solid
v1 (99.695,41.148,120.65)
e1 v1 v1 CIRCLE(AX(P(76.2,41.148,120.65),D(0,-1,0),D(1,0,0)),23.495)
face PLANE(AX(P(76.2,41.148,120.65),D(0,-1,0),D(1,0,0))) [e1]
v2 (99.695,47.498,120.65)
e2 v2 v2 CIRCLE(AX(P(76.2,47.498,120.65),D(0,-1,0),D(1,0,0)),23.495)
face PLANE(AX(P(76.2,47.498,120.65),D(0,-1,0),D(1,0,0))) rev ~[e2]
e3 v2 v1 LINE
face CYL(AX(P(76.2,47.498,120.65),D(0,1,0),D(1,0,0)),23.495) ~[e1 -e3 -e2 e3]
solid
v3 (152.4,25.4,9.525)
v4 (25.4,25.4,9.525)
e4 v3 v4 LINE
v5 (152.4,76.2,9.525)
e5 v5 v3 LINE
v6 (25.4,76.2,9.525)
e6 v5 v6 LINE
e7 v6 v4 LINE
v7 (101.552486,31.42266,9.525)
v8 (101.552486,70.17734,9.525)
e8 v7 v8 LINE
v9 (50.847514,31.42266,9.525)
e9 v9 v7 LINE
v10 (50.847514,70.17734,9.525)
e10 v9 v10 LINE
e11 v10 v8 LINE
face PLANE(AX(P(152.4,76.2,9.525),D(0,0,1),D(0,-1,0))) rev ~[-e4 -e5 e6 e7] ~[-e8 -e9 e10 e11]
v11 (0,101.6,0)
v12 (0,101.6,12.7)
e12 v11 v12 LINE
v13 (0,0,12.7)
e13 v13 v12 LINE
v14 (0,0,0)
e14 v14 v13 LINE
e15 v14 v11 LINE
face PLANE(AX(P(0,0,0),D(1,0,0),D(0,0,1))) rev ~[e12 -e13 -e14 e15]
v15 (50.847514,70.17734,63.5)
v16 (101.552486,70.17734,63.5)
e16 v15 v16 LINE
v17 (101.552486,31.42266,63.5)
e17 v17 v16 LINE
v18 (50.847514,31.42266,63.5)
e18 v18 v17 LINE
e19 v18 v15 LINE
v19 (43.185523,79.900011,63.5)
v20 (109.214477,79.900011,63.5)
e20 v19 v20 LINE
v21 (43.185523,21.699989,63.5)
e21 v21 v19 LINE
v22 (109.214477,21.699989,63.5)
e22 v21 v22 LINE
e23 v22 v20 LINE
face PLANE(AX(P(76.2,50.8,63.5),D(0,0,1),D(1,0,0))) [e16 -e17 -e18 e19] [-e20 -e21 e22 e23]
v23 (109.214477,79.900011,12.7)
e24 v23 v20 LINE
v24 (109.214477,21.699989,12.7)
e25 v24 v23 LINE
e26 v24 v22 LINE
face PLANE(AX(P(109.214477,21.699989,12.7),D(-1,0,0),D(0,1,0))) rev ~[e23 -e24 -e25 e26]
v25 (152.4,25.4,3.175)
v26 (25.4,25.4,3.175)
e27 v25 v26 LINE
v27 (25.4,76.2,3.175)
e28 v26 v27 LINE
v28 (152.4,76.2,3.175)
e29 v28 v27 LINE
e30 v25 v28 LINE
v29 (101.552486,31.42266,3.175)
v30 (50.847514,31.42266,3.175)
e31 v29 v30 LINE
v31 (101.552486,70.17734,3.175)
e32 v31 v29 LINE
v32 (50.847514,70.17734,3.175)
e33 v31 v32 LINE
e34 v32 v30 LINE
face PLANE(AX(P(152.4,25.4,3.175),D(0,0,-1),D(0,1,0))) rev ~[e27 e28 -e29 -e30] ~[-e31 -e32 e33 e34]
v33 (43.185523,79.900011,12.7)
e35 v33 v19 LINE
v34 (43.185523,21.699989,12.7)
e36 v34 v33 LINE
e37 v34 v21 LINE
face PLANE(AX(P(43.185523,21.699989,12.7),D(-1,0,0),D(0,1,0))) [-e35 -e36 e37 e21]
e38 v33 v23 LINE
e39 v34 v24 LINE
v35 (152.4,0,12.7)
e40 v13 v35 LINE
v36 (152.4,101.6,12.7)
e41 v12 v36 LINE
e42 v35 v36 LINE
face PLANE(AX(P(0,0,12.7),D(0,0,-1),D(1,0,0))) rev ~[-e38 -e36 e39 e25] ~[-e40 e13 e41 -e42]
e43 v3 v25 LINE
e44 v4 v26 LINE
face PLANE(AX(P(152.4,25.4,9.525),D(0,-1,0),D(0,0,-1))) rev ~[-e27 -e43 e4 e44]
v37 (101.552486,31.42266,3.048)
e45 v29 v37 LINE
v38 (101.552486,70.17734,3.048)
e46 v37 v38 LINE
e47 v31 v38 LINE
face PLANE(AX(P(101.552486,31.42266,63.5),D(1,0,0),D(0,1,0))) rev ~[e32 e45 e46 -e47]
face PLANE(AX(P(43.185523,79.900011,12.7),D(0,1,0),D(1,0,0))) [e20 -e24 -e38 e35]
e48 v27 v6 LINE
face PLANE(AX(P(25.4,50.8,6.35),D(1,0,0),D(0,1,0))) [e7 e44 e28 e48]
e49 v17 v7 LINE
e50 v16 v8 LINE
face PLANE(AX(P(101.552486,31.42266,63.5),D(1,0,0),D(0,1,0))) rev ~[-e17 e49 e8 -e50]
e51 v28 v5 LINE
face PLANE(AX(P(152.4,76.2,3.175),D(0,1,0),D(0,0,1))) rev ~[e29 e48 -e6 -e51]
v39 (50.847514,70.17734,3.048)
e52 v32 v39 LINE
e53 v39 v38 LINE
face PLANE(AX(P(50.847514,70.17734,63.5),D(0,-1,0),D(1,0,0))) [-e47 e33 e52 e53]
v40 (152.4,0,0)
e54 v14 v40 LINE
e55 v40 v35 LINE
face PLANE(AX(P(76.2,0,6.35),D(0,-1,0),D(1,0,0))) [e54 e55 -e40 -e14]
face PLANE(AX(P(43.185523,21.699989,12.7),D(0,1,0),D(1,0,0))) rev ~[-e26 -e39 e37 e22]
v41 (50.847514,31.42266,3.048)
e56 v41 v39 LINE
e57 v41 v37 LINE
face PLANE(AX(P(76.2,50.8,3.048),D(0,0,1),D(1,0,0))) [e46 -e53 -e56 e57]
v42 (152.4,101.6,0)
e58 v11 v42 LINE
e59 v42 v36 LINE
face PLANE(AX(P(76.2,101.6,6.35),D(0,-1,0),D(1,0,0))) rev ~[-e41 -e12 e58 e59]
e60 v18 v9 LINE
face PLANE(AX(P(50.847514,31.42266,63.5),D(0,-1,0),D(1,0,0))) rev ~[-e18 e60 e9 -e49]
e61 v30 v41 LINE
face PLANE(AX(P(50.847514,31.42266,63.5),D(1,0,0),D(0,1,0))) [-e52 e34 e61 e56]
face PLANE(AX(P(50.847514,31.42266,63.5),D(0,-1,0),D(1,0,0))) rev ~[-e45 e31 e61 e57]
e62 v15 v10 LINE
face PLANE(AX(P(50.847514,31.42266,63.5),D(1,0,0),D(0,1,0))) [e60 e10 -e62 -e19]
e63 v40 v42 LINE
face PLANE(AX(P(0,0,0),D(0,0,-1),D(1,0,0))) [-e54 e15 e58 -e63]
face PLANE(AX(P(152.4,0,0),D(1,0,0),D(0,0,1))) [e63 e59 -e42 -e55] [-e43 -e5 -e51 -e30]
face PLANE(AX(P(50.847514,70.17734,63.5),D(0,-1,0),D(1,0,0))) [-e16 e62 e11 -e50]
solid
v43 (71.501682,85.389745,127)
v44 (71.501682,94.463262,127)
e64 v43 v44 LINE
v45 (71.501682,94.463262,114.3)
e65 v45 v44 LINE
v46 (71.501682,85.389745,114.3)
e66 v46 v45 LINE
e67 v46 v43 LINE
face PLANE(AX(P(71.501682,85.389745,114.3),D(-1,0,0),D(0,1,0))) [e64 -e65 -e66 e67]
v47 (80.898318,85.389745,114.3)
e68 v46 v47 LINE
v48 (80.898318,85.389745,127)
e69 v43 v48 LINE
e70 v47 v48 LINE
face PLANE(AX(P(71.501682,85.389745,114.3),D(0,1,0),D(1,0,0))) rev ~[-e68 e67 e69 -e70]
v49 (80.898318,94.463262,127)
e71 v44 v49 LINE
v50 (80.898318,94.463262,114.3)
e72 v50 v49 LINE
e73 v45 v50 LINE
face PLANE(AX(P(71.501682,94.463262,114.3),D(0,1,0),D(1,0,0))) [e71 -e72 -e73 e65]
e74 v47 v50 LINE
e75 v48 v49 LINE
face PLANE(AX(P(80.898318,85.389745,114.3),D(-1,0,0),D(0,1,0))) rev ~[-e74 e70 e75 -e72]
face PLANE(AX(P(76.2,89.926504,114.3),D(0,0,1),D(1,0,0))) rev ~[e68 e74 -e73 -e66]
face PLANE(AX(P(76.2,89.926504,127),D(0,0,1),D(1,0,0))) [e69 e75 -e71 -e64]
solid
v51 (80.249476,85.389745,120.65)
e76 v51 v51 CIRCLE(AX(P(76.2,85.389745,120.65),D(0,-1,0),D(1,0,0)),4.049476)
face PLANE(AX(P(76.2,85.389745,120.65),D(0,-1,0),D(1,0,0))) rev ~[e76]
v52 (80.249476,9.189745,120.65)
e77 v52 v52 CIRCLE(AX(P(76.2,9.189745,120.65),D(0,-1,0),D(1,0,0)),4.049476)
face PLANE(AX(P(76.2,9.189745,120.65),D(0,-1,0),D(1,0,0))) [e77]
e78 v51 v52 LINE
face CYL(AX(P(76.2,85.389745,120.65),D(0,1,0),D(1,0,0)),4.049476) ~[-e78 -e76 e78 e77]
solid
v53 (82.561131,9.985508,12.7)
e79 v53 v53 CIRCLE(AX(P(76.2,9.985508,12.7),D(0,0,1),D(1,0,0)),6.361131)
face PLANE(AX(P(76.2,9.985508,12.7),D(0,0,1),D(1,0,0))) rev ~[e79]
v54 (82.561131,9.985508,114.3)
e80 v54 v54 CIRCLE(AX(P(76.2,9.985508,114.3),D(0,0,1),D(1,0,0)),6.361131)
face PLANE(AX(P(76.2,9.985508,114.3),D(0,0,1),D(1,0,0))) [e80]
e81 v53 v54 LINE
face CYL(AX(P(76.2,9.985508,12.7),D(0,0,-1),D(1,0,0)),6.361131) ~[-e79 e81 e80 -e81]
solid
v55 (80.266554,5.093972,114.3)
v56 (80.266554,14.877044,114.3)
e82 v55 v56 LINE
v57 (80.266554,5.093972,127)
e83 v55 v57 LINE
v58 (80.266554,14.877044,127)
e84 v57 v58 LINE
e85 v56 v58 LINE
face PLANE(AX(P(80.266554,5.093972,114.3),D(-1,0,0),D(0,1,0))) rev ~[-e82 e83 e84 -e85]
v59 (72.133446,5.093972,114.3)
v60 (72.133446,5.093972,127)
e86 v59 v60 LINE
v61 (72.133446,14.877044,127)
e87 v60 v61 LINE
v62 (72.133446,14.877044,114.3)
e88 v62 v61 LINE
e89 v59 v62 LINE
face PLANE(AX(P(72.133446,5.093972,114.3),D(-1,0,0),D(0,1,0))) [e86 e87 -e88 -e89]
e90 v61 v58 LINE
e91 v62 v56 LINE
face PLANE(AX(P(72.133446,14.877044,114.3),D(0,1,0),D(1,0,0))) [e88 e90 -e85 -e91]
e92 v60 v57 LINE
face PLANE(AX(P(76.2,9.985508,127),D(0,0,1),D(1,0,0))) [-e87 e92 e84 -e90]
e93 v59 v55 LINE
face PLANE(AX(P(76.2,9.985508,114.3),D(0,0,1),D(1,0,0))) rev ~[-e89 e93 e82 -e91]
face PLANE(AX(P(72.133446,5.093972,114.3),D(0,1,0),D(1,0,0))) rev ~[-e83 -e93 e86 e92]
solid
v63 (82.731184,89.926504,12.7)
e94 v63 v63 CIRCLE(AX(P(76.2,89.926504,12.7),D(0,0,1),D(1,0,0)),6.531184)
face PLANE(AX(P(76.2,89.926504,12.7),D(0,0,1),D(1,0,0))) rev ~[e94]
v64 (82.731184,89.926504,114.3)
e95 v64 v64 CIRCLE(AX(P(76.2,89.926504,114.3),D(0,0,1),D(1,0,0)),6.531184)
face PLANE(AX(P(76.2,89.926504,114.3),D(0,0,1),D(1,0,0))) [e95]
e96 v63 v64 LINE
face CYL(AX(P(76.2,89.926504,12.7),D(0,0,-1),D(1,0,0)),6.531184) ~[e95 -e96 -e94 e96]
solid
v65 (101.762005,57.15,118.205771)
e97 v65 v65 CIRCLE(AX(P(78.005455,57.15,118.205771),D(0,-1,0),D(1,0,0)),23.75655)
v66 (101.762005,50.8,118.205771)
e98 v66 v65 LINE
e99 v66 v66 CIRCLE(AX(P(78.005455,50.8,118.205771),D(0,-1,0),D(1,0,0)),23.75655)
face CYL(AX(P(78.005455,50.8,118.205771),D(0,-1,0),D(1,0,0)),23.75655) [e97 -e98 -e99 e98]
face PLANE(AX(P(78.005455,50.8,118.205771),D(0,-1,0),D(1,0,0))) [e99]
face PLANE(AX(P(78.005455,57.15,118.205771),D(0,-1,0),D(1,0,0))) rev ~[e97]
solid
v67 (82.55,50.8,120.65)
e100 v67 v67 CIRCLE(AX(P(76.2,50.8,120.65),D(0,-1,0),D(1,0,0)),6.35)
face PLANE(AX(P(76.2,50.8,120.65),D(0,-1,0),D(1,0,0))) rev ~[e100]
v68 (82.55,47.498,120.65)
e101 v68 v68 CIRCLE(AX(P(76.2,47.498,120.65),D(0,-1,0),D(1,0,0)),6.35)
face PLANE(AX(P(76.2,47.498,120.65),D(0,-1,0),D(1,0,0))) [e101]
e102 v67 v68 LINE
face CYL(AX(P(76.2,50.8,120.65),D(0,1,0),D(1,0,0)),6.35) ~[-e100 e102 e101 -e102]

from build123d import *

# Parameters (mm, degrees)
F0_W      = 152.4
F0_H      = 12.7
F1_DEPTH  = 101.6
F3_DEPTH  = 127
F4_W      = 66.0289544821
F4_H      = 58.2000215709
F5_DEPTH  = 50.8
F6_W      = 50.7049728394
F6_H      = 38.7546804905
F7_DEPTH  = 60.452
F8_R      = 6.3611309163
F9_DEPTH  = 101.6
F10_R     = 6.5311843642
F11_DEPTH = 101.6
F12_W     = 8.1331080545
F12_H     = 9.7830720897
F14_DEPTH = 12.7
F13_W     = 9.3966365277
F13_H     = 9.0735163396
F15_DEPTH = 12.7
F16_R     = 4.0494761519
F17_DEPTH = 76.2
F19_R     = 23.756550032
F20_DEPTH = 6.35
F21_R     = 6.35
F22_DEPTH = 3.302
F23_R     = 23.495
F24_DEPTH = 6.35


with BuildPart() as f1:
    # F0 (on Front) → F1 (new body)
    with BuildSketch(Plane.XZ):
        with Locations((76.2, 6.35)):
            Rectangle(F0_W, F0_H)
    extrude(amount=-F1_DEPTH)

    # F2 (on face) → F3 (cut)
    with BuildSketch(Plane.YZ.offset(152.4)):
        Polygon((76.2, 3.175), (76.2, 6.35), (76.2, 9.525), (25.4, 9.525), (25.4, 6.35), (25.4, 3.175), align=None)
    extrude(amount=-F3_DEPTH, mode=Mode.SUBTRACT)

    # F4 (on face) → F5 (join)
    with BuildSketch(Plane.XY.offset(12.7)):
        with Locations((76.2, 50.8)):
            Rectangle(F4_W, F4_H)
    extrude(amount=F5_DEPTH)

    # F6 (on face) → F7 (cut)
    with BuildSketch(Plane.XY.offset(63.5)):
        with Locations((76.2, 50.8)):
            Rectangle(F6_W, F6_H)
    extrude(amount=-F7_DEPTH, mode=Mode.SUBTRACT)


with BuildPart() as f9:
    # F8 (on face) → F9 (new body)
    with BuildSketch(Plane.XY.offset(12.7)):
        with Locations((76.2, 9.9855083972)):
            Circle(F8_R)
    extrude(amount=F9_DEPTH)


with BuildPart() as f11:
    # F10 (on face) → F11 (new body)
    with BuildSketch(Plane.XY.offset(12.7)):
        with Locations((76.2, 89.9265035987)):
            Circle(F10_R)
    extrude(amount=F11_DEPTH)


with BuildPart() as f14:
    # F12 (on face) → F14 (new body)
    with BuildSketch(Plane.XY.offset(114.3)):
        with Locations((76.2, 9.9855083972)):
            Rectangle(F12_W, F12_H)
    extrude(amount=F14_DEPTH)


with BuildPart() as f15:
    # F13 (on face) → F15 (new body)
    with BuildSketch(Plane.XY.offset(114.3)):
        with Locations((76.2, 89.9265035987)):
            Rectangle(F13_W, F13_H)
    extrude(amount=F15_DEPTH)


with BuildPart() as f17:
    # F16 (on face) → F17 (new body)
    with BuildSketch(Plane.XZ.offset(-85.3897454289)):
        with Locations((76.2, 120.65)):
            Circle(F16_R)
    extrude(amount=F17_DEPTH)


with BuildPart() as f20:
    # F19 (on offset) → F20 (new body)
    with BuildSketch(Plane.XZ.offset(-50.8)):
        with Locations((78.0054554343, 118.2057708502)):
            Circle(F19_R)
    extrude(amount=-F20_DEPTH)


with BuildPart() as f22:
    # F21 (on face) → F22 (new body)
    with BuildSketch(Plane.XZ.offset(-50.8)):
        with Locations((76.2, 120.65)):
            Circle(F21_R)
    extrude(amount=F22_DEPTH)


with BuildPart() as f24:
    # F23 (on face) → F24 (new body)
    with BuildSketch(Plane.XZ.offset(-47.498)):
        with Locations((76.2, 120.65)):
            Circle(F23_R)
    extrude(amount=F24_DEPTH)


solid = Compound([f1.part, f9.part, f11.part, f14.part, f15.part, f17.part, f20.part, f22.part, f24.part])
